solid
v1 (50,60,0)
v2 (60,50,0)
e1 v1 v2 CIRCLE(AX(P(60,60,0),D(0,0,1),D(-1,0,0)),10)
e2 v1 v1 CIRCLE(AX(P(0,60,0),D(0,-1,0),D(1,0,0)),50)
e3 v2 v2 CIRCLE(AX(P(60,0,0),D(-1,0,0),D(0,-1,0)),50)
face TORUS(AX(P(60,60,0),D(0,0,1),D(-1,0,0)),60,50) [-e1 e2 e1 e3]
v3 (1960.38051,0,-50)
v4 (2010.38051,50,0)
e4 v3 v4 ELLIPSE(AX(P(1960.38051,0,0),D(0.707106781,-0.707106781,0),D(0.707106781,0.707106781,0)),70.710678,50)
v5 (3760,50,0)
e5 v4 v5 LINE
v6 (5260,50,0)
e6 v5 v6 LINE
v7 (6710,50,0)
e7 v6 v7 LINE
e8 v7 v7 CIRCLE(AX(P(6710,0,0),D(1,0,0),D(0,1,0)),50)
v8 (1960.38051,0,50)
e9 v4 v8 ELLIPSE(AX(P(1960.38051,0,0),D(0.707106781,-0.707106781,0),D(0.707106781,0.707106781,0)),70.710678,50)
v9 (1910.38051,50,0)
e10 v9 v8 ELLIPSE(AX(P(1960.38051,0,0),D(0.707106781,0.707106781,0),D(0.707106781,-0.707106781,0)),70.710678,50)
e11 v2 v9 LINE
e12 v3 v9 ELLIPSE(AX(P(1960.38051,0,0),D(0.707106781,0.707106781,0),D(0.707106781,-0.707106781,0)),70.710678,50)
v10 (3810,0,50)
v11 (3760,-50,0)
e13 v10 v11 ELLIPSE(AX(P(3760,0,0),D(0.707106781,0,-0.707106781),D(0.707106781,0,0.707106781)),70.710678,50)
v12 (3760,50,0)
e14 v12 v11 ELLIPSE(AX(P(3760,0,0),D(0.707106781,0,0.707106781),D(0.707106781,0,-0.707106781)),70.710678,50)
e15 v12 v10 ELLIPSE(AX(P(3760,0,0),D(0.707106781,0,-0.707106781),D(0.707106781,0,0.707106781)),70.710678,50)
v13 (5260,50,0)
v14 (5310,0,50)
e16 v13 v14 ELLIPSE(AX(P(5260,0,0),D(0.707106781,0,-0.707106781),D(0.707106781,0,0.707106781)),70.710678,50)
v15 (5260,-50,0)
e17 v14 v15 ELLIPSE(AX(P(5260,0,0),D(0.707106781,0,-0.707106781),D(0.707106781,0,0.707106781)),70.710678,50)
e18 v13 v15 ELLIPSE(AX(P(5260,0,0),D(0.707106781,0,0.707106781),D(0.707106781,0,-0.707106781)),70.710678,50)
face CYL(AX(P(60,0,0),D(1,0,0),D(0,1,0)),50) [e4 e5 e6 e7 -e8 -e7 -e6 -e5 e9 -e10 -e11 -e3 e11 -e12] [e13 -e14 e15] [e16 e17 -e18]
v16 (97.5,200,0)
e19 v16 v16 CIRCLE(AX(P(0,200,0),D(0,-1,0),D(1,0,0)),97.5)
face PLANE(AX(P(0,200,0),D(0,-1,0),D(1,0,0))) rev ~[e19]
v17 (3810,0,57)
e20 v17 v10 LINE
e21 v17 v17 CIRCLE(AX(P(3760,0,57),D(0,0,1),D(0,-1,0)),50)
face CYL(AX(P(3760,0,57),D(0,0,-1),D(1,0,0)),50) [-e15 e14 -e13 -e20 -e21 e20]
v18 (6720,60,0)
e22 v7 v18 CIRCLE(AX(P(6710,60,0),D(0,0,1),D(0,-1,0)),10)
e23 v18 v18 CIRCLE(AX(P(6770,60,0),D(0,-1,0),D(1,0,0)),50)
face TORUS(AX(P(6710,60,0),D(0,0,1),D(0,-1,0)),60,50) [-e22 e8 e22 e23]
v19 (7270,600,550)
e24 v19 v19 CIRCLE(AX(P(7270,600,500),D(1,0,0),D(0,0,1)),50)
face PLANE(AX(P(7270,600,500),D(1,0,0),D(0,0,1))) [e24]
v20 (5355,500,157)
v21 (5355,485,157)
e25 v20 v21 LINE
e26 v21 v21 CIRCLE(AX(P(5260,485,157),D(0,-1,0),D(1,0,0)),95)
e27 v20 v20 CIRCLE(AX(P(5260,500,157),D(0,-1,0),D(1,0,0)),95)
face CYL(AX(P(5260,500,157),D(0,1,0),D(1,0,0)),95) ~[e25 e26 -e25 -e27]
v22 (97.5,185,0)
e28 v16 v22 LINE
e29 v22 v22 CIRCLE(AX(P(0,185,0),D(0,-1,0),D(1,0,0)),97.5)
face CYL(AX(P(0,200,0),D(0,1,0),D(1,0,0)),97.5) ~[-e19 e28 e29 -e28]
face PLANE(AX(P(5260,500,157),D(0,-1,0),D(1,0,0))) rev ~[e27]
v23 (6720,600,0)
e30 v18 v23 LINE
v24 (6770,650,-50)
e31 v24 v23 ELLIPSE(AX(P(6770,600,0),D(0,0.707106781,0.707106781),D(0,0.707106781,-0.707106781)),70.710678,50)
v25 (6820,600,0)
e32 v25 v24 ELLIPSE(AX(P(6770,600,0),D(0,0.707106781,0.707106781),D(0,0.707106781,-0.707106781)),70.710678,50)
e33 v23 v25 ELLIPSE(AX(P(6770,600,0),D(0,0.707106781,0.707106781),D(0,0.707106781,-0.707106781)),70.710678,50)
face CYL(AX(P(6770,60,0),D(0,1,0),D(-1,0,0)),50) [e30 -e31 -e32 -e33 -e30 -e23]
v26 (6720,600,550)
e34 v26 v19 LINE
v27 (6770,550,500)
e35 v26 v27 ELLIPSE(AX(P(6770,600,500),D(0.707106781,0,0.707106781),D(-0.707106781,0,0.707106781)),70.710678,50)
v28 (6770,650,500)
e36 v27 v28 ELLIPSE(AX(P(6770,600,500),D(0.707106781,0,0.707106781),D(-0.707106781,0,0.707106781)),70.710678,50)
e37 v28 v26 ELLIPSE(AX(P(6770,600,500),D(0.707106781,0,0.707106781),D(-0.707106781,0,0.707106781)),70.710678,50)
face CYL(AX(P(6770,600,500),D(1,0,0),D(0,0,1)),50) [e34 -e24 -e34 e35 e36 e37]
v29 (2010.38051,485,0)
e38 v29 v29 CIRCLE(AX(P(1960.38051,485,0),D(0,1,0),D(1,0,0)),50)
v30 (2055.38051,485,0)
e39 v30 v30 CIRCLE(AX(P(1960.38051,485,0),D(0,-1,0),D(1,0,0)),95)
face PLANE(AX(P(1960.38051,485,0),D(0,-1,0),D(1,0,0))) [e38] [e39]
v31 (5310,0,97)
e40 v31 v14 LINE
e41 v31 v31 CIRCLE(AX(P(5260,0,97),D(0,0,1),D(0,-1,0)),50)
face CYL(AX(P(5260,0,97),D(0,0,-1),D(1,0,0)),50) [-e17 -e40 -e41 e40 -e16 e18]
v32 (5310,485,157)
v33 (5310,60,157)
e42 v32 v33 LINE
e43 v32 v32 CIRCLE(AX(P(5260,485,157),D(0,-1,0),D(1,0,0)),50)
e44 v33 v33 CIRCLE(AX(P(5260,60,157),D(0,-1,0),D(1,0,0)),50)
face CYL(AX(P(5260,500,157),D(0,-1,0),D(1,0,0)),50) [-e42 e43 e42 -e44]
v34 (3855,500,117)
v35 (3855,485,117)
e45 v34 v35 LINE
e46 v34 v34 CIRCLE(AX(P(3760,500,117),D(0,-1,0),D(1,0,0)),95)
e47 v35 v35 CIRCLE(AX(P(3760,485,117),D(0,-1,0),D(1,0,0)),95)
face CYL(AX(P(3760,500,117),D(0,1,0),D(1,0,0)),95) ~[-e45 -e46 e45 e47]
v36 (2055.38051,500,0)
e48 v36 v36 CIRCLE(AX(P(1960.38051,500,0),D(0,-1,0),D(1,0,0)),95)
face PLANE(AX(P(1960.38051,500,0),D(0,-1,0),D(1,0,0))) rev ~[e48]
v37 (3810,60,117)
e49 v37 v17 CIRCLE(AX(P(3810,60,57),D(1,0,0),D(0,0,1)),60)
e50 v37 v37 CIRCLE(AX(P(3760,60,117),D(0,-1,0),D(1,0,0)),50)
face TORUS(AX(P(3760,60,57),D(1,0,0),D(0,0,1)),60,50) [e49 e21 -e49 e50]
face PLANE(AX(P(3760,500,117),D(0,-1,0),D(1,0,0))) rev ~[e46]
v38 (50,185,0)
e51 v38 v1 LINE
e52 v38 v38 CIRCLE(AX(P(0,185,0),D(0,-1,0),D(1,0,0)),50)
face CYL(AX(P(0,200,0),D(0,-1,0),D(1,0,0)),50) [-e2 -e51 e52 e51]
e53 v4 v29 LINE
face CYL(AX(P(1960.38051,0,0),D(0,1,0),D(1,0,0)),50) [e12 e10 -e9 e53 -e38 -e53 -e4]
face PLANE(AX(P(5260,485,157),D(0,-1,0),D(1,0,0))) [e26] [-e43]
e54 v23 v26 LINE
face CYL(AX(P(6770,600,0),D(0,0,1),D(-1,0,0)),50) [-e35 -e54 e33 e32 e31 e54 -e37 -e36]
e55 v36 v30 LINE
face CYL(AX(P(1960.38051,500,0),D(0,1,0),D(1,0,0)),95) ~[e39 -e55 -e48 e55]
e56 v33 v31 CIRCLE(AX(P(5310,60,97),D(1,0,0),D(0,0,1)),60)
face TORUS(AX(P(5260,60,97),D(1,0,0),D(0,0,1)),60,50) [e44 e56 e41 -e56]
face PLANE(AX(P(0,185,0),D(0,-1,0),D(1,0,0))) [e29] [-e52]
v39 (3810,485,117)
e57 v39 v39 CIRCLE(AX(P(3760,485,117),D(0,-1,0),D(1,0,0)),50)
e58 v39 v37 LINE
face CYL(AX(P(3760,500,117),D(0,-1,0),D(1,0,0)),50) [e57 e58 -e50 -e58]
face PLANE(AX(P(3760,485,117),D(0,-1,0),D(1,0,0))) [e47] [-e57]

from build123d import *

# Parameters (mm, degrees)
F2_R      = 50
F2_R_2    = 97.5
F9_DEPTH  = 15
F14_R     = 50
F14_R_2   = 95
F18_DEPTH = 15


# Not quite as in the source:
# - a feature names something its author has since deleted; it is built from what else it names


with BuildPart() as f8:
    # F8: sweep along a path in F0, F5, F7
    with BuildLine(Plane.XY) as f8_path:
        Line((0, 200), (0, 60))
        ThreePointArc((0, 60), (17.5735931288, 17.5735931288), (60, 0))
        Line((60, 0), (6710, 0))
        ThreePointArc((6710, 0), (6752.4264068712, 17.5735931288), (6770, 60))
        Line((6770, 60), (6770, 540))
        Line((6770, 540), (6770, 600))
    with BuildLine(Plane.YZ.offset(6770)) as f8_path_2:
        Line((600, 0), (600, 500))
    with BuildLine(Plane.XZ.offset(-600)) as f8_path_3:
        Line((6770, 500), (7270, 500))
    # F2 (on offset) → F8 (sweep)
    with BuildSketch(Plane.XZ.offset(-200)):
        Circle(F2_R)
    sweep(path=f8_path.line + f8_path_2.line + f8_path_3.line, transition=Transition.RIGHT)

    # F2 (on offset) → F9 (join)
    with BuildSketch(Plane.XZ.offset(-200)):
        Circle(F2_R_2)
        Circle(F2_R, mode=Mode.SUBTRACT)
        Circle(F2_R)
    extrude(amount=F9_DEPTH)

    # F15: sweep along a path in F0
    with BuildLine(Plane.XY) as f15_path:
        Line((1960.38051, 0), (1960.38051, 500))
    # F14 (on offset) → F15 (sweep)
    with BuildSketch(Plane.XZ.offset(-500)):
        with Locations((1960.38051, 0)):
            Circle(F14_R)
    sweep(path=f15_path.line)

    # F16: sweep along a path in F11
    with BuildLine(Plane.YZ.offset(3760)) as f16_path:
        Line((500, 117), (60, 117))
        ThreePointArc((60, 117), (17.5735931288, 99.4264068712), (0, 57))
        Line((0, 57), (0, 0))
    # F14 (on offset) → F16 (sweep)
    with BuildSketch(Plane.XZ.offset(-500)):
        with Locations((3760, 117)):
            Circle(F14_R)
    sweep(path=f16_path.line)

    # F17: sweep along a path in F13
    with BuildLine(Plane.YZ.offset(5260)) as f17_path:
        Line((500, 157), (60, 157))
        ThreePointArc((60, 157), (17.5735931288, 139.4264068712), (0, 97))
        Line((0, 97), (0, 0))
    # F14 (on offset) → F17 (sweep)
    with BuildSketch(Plane.XZ.offset(-500)):
        with Locations((5260, 157)):
            Circle(F14_R)
    sweep(path=f17_path.line)

    # F14 (on offset) → F18 (join)
    with BuildSketch(Plane.XZ.offset(-500)):
        with Locations((1960.38051, 0)):
            Circle(F14_R_2)
        with Locations((1960.38051, 0)):
            Circle(F14_R, mode=Mode.SUBTRACT)
        with Locations((3760, 117)):
            Circle(F14_R_2)
        with Locations((3760, 117)):
            Circle(F14_R, mode=Mode.SUBTRACT)
        with Locations((5260, 157)):
            Circle(F14_R_2)
        with Locations((5260, 157)):
            Circle(F14_R, mode=Mode.SUBTRACT)
        with Locations((1960.38051, 0)):
            Circle(F14_R)
        with Locations((3760, 117)):
            Circle(F14_R)
        with Locations((5260, 157)):
            Circle(F14_R)
    extrude(amount=F18_DEPTH)


solid = f8.part
